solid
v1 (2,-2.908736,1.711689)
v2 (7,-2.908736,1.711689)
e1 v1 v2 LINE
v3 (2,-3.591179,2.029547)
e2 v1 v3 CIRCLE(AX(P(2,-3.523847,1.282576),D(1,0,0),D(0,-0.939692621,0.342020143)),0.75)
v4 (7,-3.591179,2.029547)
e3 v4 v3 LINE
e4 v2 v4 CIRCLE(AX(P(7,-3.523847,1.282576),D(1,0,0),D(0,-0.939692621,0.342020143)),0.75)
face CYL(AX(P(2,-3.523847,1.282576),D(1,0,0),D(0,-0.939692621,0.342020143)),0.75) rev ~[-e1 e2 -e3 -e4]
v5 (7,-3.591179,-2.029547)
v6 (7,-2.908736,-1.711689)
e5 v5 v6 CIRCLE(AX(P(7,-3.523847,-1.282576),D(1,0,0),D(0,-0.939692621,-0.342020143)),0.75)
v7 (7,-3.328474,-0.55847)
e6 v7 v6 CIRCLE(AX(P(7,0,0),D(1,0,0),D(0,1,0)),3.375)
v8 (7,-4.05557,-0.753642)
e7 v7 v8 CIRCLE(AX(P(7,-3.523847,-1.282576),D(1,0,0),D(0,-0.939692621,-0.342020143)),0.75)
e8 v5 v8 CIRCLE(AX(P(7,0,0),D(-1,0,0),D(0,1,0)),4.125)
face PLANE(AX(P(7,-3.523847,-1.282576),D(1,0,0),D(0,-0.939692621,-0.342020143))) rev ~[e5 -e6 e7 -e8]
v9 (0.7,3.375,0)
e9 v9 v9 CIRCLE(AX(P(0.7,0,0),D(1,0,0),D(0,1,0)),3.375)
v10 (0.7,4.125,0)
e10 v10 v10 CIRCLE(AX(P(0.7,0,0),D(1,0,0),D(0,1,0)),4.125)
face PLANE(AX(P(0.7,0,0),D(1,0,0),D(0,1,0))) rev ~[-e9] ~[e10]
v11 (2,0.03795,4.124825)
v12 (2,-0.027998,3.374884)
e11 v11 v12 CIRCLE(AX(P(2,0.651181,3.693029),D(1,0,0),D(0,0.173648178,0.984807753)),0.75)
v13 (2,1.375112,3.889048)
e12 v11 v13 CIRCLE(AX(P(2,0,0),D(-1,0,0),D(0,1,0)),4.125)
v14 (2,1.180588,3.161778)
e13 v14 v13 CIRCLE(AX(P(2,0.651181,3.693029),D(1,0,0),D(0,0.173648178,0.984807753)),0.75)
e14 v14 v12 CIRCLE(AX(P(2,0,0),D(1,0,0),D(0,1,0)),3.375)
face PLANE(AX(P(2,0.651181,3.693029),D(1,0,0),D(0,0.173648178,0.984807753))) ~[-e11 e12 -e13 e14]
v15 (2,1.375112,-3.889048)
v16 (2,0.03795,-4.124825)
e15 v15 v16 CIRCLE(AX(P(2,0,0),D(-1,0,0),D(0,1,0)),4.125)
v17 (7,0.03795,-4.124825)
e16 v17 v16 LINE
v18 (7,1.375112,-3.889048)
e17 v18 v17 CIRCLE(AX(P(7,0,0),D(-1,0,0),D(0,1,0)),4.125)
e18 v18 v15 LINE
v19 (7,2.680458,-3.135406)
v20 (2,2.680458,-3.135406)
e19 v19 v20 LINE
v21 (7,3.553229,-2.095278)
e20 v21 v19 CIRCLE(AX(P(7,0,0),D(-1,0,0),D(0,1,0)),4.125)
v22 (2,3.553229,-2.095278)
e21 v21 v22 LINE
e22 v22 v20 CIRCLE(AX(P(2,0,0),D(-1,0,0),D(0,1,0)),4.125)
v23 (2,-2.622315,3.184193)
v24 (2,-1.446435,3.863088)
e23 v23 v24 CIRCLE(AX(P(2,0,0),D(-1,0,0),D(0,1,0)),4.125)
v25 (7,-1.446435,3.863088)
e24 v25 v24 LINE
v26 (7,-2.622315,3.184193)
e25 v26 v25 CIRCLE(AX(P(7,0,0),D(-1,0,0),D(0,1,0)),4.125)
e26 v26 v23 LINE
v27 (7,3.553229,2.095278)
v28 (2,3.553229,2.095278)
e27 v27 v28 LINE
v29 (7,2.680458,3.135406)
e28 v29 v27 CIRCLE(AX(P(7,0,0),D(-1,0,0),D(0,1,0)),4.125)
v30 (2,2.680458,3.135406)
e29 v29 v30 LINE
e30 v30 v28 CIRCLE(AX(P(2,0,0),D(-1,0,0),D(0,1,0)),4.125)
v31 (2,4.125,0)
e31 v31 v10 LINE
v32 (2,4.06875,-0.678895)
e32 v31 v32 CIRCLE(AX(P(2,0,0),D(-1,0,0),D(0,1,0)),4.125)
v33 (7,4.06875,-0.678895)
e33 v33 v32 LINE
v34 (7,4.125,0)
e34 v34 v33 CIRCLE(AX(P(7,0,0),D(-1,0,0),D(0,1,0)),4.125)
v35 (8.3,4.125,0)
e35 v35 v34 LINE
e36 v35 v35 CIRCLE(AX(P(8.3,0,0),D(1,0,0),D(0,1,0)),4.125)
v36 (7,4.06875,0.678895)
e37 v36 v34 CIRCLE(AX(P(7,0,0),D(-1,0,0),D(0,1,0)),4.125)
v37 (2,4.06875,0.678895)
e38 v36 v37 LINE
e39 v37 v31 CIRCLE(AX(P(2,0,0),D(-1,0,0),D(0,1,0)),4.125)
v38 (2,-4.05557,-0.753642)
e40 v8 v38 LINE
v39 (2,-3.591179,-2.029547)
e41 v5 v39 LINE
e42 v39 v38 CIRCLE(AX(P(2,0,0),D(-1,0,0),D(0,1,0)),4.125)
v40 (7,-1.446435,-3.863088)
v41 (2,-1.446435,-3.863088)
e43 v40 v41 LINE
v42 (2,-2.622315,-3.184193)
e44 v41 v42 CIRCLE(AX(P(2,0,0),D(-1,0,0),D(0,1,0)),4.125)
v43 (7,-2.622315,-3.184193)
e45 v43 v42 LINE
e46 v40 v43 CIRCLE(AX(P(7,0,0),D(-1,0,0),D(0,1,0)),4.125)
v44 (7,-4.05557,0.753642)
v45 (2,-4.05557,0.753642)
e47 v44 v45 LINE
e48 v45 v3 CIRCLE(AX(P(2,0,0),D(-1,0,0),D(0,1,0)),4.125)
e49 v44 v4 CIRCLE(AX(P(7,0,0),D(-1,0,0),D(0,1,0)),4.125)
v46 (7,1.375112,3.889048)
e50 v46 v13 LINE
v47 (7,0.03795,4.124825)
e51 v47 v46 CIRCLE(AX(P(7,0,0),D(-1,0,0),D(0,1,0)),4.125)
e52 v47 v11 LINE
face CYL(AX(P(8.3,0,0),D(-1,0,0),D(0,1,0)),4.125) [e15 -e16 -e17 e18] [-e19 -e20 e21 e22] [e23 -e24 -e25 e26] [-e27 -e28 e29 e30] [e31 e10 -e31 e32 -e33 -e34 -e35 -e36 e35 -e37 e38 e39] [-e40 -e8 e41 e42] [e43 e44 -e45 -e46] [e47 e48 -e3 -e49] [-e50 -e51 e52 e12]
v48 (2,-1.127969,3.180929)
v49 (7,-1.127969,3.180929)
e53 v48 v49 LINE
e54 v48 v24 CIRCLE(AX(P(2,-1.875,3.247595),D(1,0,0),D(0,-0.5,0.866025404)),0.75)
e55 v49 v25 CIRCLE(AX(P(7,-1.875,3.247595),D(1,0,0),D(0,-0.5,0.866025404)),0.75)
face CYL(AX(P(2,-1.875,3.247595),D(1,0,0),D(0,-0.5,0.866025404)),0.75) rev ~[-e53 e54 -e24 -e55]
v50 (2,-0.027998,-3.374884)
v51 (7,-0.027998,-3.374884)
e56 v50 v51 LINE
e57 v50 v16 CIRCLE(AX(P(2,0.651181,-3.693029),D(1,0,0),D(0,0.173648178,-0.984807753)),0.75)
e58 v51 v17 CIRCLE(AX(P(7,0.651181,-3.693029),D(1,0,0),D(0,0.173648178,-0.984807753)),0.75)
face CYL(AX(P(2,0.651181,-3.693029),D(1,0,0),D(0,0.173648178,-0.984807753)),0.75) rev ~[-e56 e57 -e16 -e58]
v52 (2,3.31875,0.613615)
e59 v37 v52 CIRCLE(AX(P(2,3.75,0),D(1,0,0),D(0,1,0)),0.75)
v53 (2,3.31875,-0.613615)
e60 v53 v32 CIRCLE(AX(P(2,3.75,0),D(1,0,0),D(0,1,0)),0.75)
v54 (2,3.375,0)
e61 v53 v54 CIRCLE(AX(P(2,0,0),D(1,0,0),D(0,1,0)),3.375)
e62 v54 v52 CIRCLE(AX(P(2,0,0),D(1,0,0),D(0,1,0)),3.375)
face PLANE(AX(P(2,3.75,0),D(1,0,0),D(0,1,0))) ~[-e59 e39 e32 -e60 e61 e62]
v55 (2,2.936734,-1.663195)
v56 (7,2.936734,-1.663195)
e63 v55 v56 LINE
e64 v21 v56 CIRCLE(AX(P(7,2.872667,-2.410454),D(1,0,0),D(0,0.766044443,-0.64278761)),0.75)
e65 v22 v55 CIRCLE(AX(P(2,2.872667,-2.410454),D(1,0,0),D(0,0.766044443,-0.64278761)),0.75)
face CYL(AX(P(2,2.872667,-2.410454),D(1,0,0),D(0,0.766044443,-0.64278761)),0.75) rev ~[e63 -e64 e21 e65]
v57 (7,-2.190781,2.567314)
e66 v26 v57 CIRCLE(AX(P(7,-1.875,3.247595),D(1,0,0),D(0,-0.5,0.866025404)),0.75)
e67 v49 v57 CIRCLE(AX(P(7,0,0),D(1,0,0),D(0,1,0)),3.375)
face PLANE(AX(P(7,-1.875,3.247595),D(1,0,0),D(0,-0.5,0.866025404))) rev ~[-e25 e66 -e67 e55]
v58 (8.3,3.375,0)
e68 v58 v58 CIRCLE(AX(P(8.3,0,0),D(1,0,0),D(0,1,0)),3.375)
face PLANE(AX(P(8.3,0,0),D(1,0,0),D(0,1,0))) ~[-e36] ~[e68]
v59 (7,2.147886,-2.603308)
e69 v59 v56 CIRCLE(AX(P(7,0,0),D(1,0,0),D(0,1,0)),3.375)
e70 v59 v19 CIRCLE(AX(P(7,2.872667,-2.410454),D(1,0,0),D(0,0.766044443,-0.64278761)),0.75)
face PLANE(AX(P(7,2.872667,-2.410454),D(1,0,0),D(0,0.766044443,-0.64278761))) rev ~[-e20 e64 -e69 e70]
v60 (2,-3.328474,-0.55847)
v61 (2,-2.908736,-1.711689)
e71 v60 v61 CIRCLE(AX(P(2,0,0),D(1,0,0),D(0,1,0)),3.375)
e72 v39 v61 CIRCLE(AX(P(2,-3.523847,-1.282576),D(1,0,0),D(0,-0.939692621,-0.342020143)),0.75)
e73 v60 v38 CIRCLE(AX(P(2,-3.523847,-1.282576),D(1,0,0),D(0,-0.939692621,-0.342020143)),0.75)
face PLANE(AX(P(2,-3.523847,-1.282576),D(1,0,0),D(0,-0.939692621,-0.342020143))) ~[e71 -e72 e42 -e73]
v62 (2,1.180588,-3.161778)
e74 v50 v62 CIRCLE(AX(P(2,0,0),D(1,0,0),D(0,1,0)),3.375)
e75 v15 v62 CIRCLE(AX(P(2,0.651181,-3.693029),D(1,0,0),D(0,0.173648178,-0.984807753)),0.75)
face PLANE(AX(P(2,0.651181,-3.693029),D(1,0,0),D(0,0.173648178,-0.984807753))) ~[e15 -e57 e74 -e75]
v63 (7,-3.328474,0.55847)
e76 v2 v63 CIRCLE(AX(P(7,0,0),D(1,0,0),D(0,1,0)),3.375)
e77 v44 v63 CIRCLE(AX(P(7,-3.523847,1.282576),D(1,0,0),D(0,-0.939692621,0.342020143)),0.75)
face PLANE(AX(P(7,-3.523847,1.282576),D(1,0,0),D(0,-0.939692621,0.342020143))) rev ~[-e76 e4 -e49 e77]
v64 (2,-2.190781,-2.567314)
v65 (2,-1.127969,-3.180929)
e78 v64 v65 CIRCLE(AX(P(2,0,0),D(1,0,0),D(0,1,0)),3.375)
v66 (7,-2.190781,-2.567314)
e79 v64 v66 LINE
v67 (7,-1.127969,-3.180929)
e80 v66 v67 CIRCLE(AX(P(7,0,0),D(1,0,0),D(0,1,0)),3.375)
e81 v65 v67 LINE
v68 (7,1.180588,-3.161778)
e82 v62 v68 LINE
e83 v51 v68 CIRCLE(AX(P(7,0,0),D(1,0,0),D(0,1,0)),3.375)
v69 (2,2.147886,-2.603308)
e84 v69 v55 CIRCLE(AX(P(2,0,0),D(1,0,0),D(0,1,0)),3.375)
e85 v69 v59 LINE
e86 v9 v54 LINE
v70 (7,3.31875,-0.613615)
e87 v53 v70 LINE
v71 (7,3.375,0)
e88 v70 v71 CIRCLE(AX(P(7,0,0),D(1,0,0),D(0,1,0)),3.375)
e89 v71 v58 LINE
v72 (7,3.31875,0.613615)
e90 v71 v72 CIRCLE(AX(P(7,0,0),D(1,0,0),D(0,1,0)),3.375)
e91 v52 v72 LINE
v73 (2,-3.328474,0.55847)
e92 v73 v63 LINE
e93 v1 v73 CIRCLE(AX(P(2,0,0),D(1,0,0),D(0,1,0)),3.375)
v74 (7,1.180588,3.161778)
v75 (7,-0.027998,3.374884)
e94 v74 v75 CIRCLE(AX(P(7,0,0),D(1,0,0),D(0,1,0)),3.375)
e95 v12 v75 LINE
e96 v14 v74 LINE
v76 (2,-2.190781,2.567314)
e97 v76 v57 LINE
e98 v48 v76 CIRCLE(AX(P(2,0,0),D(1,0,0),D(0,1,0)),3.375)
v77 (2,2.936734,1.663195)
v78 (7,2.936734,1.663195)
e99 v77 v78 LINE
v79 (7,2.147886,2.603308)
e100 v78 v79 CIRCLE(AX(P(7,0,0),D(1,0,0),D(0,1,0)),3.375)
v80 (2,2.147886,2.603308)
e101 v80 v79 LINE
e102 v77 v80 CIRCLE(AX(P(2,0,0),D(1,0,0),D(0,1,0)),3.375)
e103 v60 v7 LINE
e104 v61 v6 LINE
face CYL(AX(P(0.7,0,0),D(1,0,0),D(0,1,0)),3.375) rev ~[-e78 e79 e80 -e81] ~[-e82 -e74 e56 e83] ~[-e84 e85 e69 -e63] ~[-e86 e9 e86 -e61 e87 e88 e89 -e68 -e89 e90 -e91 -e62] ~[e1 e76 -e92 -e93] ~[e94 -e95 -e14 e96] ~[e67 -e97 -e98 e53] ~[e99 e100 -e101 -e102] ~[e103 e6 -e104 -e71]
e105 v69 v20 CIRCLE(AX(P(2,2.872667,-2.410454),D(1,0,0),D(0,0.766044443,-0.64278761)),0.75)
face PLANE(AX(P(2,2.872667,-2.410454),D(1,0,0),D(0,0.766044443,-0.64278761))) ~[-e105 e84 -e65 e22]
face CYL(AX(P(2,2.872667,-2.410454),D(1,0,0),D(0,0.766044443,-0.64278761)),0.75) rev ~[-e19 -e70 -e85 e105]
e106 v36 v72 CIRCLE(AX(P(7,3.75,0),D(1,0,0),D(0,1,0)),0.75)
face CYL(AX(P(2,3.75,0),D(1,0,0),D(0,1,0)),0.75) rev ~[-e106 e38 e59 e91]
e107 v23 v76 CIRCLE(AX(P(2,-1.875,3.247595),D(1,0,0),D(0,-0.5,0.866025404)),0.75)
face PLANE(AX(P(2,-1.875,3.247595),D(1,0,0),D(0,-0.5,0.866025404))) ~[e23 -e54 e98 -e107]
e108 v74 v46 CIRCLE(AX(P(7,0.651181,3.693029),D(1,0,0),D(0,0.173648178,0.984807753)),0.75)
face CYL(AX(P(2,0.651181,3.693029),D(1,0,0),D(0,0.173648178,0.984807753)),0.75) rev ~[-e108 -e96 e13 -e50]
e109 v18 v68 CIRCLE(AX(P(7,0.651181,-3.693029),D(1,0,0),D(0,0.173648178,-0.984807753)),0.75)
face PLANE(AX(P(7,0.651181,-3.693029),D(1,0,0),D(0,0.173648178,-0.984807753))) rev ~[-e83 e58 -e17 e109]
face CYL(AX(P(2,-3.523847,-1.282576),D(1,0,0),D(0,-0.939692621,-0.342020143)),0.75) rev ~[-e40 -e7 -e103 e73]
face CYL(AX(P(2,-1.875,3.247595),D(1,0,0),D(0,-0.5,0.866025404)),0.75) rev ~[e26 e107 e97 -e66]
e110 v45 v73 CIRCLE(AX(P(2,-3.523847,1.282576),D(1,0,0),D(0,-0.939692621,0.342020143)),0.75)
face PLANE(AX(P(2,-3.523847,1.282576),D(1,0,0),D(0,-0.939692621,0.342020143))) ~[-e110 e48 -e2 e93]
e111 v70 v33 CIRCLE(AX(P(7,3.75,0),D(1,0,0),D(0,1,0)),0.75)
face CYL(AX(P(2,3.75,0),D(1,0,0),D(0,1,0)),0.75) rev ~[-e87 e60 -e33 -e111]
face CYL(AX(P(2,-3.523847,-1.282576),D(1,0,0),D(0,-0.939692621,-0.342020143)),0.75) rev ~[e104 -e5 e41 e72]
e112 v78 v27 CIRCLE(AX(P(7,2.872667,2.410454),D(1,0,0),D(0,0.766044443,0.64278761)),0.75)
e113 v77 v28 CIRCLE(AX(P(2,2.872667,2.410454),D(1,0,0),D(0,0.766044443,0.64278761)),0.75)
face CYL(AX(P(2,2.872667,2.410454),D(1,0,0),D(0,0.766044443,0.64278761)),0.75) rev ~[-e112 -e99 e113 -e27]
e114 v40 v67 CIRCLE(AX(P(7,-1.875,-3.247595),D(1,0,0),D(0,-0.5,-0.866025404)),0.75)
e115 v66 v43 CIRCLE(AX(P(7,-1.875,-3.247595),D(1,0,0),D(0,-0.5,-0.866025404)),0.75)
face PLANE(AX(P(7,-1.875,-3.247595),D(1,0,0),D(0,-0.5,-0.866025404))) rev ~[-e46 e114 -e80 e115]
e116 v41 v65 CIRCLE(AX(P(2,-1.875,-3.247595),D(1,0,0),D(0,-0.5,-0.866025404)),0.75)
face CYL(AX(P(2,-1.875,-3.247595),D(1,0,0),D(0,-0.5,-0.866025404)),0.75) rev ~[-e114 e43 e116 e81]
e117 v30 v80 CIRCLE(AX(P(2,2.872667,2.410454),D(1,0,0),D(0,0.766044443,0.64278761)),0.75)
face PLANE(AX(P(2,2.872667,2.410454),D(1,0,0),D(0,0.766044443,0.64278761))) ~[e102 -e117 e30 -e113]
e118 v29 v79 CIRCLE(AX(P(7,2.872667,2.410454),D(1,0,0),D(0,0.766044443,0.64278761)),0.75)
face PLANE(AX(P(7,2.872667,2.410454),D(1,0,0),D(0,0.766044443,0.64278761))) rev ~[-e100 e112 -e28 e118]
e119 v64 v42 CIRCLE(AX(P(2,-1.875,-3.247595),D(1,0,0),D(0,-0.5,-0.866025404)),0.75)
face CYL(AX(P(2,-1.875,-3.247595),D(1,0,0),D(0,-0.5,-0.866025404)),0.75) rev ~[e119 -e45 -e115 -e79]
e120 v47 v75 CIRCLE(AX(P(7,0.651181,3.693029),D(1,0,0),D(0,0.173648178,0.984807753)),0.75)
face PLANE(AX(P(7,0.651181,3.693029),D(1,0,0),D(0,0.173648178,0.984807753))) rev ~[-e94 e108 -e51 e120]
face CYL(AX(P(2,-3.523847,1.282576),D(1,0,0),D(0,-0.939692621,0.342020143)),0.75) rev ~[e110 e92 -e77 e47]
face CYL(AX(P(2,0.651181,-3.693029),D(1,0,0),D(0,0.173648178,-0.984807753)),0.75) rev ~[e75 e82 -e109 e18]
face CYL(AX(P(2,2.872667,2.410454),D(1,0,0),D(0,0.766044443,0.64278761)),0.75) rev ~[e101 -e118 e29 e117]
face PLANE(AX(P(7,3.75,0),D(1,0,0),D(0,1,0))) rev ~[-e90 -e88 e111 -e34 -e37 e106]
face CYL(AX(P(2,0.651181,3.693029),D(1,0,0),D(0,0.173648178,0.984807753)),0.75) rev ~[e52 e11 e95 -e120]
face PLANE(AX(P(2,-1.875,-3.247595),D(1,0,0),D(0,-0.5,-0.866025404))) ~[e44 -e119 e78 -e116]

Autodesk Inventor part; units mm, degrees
sketch "Sketch_1" plane through (0, 0, 0) normal (0, 0, 1) x (1, 0, 0)
  line L0 (8.3, 0) -> (0.7, 0)
  line L1 (0.7, 3.375) -> (8.3, 3.375)
  line L2 (8.3, 3.375) -> (8.3, 4.125)
  line L3 (8.3, 4.125) -> (0.7, 4.125)
  line L4 (0.7, 4.125) -> (0.7, 3.375)
revolve "Revolution1" add sketch "Sketch_1" angle 360 about axis through (8.3, 0, 0) along (1, 0, 0)
sketch "Sketch_2" plane through (0, 0, 0) normal (0, 0, 1) x (1, 0, 0)
  line L0 (7, 3.75) -> (2, 3.75)
  line L1 (2, 3.75) -> (2, 4.5)
  line L2 (2, 4.5) -> (7, 4.5)
  line L3 (7, 4.5) -> (7, 3.75)
  line L4 (7, 3.75) -> (2, 3.75)
revolve "Revolution2" cut sketch "Sketch_2" angle 360 about axis through (7, 3.75, 0) along (1, 0, 0)
pattern_circular "Circular Pattern1" count 9 over 360 about axis through (4.5, 0, 0) along (1, 0, 0) of "Revolution2"
ref_plane "IP_1_XY" through (4.5, 0, 0) normal (1, 0, 0) x (0, 0, -1)
ref_plane "IP_1_YZ" through (4.5, 0, 0) normal (0, 0, -1) x (0, 1, 0)
ref_plane "IP_1_ZX" through (4.5, 0, 0) normal (0, 1, 0) x (1, 0, 0)
ref_plane "IP_3_1_XY" through (4.5, 3.75, 0) normal (1, 0, 0) x (0, 0, -1)
ref_plane "IP_3_1_YZ" through (4.5, 3.75, 0) normal (0, 0, -1) x (0, 1, 0)
ref_plane "IP_3_1_ZX" through (4.5, 3.75, 0) normal (0, 1, 0) x (1, 0, 0)
ref_plane "IP_3_2_XY" through (4.5, 2.8727, 2.4105) normal (1, 0, 0) x (0, 0, -1)
ref_plane "IP_3_2_YZ" through (4.5, 2.8727, 2.4105) normal (0, 0, -1) x (0, 1, 0)
ref_plane "IP_3_2_ZX" through (4.5, 2.8727, 2.4105) normal (0, 1, 0) x (1, 0, 0)
ref_plane "IP_3_3_XY" through (4.5, 0.6512, 3.693) normal (1, 0, 0) x (0, 0, -1)
ref_plane "IP_3_3_YZ" through (4.5, 0.6512, 3.693) normal (0, 0, -1) x (0, 1, 0)
ref_plane "IP_3_3_ZX" through (4.5, 0.6512, 3.693) normal (0, 1, 0) x (1, 0, 0)
ref_plane "IP_3_4_XY" through (4.5, -1.875, 3.2476) normal (1, 0, 0) x (0, 0, -1)
ref_plane "IP_3_4_YZ" through (4.5, -1.875, 3.2476) normal (0, 0, -1) x (0, 1, 0)
ref_plane "IP_3_4_ZX" through (4.5, -1.875, 3.2476) normal (0, 1, 0) x (1, 0, 0)
ref_plane "IP_3_5_XY" through (4.5, -3.5238, 1.2826) normal (1, 0, 0) x (0, 0, -1)
ref_plane "IP_3_5_YZ" through (4.5, -3.5238, 1.2826) normal (0, 0, -1) x (0, 1, 0)
ref_plane "IP_3_5_ZX" through (4.5, -3.5238, 1.2826) normal (0, 1, 0) x (1, 0, 0)
ref_plane "IP_3_6_XY" through (4.5, -3.5238, -1.2826) normal (1, 0, 0) x (0, 0, -1)
ref_plane "IP_3_6_YZ" through (4.5, -3.5238, -1.2826) normal (0, 0, -1) x (0, 1, 0)
ref_plane "IP_3_6_ZX" through (4.5, -3.5238, -1.2826) normal (0, 1, 0) x (1, 0, 0)
ref_plane "IP_3_7_XY" through (4.5, -1.875, -3.2476) normal (1, 0, 0) x (0, 0, -1)
ref_plane "IP_3_7_YZ" through (4.5, -1.875, -3.2476) normal (0, 0, -1) x (0, 1, 0)
ref_plane "IP_3_7_ZX" through (4.5, -1.875, -3.2476) normal (0, 1, 0) x (1, 0, 0)
ref_plane "IP_3_8_XY" through (4.5, 0.6512, -3.693) normal (1, 0, 0) x (0, 0, -1)
ref_plane "IP_3_8_YZ" through (4.5, 0.6512, -3.693) normal (0, 0, -1) x (0, 1, 0)
ref_plane "IP_3_8_ZX" through (4.5, 0.6512, -3.693) normal (0, 1, 0) x (1, 0, 0)
ref_plane "IP_3_9_XY" through (4.5, 2.8727, -2.4105) normal (1, 0, 0) x (0, 0, -1)
ref_plane "IP_3_9_YZ" through (4.5, 2.8727, -2.4105) normal (0, 0, -1) x (0, 1, 0)
ref_plane "IP_3_9_ZX" through (4.5, 2.8727, -2.4105) normal (0, 1, 0) x (1, 0, 0)
properties part number "HK0609FMCA"
